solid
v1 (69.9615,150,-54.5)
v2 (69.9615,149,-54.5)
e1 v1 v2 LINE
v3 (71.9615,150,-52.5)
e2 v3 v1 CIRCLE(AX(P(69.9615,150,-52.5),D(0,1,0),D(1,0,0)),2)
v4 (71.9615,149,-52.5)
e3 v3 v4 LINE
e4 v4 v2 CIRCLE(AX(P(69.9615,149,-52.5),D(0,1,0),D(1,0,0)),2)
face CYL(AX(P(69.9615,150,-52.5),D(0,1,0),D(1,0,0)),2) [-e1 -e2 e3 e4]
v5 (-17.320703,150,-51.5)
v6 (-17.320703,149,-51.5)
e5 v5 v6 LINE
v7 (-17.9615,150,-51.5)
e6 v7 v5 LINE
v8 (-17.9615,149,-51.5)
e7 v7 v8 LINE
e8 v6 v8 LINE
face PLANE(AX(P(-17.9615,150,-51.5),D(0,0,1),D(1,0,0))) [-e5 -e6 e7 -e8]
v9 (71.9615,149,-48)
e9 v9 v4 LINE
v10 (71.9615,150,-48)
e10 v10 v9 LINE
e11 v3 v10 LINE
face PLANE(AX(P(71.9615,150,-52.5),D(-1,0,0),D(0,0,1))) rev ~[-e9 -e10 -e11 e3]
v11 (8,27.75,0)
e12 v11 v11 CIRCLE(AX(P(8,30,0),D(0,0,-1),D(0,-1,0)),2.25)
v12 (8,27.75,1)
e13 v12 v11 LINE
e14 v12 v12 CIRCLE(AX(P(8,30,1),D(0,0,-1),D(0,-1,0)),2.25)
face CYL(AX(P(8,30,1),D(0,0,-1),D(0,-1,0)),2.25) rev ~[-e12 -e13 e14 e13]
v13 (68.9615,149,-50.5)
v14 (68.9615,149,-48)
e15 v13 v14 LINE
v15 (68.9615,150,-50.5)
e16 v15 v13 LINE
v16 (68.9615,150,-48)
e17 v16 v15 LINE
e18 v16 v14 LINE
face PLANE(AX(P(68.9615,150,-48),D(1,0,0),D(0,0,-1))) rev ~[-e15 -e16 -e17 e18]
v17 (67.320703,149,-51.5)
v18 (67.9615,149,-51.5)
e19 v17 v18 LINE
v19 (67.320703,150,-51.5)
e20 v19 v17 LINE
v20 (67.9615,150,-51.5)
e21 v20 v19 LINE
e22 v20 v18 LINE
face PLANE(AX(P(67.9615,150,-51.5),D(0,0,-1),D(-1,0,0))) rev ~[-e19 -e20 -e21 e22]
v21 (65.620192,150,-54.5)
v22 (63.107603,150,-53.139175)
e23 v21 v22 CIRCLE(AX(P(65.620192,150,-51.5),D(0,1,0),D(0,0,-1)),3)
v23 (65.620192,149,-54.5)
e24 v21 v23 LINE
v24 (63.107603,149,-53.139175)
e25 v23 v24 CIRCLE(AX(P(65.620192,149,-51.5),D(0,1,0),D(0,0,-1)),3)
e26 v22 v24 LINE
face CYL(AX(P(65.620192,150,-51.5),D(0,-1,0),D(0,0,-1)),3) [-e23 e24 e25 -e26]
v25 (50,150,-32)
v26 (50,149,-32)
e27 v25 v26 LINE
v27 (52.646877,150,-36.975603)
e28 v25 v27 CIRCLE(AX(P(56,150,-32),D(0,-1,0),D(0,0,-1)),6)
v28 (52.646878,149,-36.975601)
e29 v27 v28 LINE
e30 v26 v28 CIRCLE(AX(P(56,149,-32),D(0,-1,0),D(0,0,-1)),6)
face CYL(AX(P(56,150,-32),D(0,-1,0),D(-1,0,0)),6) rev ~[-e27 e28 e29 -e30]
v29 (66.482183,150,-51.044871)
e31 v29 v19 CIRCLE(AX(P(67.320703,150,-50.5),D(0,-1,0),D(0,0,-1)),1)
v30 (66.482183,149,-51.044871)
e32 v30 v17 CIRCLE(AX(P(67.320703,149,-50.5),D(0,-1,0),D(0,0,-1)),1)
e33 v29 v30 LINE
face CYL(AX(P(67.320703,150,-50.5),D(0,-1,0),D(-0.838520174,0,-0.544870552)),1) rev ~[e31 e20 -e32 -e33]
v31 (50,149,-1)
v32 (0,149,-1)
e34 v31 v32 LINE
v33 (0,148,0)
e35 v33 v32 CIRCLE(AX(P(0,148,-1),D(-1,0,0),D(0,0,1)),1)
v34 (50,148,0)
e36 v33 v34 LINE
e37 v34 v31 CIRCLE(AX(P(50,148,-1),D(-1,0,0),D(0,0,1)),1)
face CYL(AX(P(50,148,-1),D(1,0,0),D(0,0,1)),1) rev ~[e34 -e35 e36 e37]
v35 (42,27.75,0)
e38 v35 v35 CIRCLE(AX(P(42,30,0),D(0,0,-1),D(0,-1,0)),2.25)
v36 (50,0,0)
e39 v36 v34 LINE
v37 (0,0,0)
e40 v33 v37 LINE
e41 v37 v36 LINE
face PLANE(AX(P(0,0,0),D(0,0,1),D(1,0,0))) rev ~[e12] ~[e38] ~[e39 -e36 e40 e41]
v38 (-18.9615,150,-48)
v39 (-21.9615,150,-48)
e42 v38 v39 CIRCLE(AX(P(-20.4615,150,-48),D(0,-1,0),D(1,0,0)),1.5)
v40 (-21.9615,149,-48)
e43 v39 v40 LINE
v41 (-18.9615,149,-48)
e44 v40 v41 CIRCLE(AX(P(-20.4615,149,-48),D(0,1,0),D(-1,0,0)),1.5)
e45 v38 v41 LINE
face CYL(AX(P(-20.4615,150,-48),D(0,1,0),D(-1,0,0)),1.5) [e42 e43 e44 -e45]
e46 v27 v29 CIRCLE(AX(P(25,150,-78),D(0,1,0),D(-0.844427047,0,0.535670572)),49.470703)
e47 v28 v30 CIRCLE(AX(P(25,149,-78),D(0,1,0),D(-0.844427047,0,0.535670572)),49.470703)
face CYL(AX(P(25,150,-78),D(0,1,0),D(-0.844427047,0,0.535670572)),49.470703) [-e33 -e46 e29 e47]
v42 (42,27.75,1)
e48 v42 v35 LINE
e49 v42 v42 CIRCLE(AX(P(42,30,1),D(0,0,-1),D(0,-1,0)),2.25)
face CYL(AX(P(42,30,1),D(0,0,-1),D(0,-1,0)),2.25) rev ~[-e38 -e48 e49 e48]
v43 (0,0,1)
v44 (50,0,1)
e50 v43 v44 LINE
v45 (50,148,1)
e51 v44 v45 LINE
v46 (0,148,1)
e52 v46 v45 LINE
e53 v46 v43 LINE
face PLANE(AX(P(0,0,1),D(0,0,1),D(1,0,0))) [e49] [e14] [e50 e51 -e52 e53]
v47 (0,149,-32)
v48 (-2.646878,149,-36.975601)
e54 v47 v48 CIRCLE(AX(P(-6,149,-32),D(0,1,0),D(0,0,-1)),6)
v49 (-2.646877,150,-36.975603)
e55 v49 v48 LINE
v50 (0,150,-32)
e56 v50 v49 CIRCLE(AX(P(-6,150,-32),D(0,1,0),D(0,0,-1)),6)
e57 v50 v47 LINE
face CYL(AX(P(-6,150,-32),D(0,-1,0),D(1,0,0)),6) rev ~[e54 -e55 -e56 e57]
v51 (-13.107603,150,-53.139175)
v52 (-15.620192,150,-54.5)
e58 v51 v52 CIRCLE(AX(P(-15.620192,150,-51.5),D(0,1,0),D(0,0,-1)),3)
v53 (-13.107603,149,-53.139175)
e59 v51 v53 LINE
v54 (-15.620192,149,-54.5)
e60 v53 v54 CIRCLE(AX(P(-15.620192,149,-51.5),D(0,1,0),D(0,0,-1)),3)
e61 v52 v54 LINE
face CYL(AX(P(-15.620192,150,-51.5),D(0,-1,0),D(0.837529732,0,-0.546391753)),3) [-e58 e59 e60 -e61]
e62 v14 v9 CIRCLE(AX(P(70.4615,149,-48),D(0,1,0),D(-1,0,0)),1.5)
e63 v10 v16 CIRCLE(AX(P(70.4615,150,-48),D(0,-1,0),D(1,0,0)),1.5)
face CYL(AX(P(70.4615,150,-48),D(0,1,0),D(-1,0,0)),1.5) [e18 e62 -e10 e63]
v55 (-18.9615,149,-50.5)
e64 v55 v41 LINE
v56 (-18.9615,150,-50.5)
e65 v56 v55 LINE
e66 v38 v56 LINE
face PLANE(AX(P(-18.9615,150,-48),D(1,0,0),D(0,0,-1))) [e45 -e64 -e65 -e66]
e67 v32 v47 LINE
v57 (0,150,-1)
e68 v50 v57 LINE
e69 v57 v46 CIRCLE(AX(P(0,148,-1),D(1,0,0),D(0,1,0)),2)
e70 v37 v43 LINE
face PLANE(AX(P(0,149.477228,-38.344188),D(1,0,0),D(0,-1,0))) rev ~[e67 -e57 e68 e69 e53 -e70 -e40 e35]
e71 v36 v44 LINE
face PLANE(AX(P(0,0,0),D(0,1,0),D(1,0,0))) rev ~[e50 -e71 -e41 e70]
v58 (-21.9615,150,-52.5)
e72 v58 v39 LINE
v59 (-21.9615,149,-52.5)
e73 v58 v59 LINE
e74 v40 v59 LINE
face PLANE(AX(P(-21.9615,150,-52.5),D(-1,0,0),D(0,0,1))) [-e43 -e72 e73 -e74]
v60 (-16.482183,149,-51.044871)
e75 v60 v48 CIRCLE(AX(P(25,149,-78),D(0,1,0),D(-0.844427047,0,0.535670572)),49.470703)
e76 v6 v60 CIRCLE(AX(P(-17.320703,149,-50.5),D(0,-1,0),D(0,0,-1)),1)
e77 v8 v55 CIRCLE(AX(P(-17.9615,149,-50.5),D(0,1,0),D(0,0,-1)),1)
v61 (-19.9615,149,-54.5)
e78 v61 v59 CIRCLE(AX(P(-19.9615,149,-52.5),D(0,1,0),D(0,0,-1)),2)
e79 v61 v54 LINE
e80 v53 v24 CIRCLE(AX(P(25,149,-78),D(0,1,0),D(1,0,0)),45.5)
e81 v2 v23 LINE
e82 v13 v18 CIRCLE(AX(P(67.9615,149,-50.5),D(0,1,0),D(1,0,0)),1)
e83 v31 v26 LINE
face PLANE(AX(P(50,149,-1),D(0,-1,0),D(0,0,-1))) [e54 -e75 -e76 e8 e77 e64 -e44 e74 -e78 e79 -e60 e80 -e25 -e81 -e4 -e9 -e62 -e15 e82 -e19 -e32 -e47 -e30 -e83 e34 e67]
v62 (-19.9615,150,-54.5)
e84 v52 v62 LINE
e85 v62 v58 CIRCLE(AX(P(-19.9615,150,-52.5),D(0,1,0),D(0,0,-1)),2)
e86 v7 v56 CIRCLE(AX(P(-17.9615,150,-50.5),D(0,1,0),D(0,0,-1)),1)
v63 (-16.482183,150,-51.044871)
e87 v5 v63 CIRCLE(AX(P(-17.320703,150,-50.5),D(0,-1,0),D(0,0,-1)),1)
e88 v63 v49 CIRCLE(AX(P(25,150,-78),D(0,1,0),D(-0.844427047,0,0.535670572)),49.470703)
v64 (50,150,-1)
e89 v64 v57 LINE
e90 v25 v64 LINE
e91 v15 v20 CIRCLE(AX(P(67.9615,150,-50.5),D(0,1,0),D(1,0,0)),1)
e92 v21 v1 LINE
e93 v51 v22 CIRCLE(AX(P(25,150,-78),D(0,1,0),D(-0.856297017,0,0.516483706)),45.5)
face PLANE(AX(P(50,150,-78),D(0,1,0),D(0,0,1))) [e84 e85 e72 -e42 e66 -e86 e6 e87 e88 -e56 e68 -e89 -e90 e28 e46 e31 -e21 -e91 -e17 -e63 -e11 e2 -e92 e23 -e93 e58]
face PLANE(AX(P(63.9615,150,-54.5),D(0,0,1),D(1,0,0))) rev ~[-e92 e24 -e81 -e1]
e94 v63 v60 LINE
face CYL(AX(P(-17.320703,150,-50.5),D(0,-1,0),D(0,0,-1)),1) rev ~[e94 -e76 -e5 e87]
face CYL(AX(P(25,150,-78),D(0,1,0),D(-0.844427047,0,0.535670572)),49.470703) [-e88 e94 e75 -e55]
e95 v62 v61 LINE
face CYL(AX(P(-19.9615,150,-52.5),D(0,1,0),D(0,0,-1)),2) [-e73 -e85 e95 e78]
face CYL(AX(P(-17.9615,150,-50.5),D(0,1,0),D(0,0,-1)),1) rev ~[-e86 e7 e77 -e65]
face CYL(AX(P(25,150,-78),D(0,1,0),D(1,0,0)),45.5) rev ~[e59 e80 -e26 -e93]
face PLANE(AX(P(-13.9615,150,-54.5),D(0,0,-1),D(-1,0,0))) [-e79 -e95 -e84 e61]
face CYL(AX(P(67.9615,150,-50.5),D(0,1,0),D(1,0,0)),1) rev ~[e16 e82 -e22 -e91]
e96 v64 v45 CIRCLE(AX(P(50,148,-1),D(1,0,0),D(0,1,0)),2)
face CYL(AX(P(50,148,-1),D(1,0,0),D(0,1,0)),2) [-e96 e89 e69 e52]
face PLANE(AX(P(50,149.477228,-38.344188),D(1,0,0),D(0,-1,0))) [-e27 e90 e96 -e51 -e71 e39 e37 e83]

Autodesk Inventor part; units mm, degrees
ref_plane "YZ Plane" through (0, 0, 0) normal (1, 0, 0) x (0, 1, 0)
ref_plane "XZ Plane" through (0, 0, 0) normal (0, 1, 0) x (-1, 0, 0)
ref_plane "XY Plane" through (0, 0, 0) normal (0, 0, 1) x (1, 0, 0)
sketch "Sketch1" plane through (0, 0, 0) normal (0, 0, 1) x (1, 0, 0)
  line L0 (0, 0) -> (50, 0)
  line L1 (50, 0) -> (50, 150)
  line L2 (50, 150) -> (0, 150)
  line L3 (0, 150) -> (0, 0)
  dimension "d0" = 50
  dimension "d1" = 150
extrude "Plate1" add sketch "Sketch1" along normal blind 1
sketch "Sketch2" plane through (50, 149, 1) normal (0, 1, 0) x (-1, 0, 0)
  line L0 (50, 0) -> (0, 0)
  line L1 (0, 0) -> (0, -79)
  line L2 (0, -79) -> (50, -79)
  line L3 (50, -79) -> (50, 0)
edge flange "Flange1" height 79 angle 90 thickness 1 bend radius 1 thickness toward (0, 1, 0) relief tear relief width 1 relief depth 0.5 edges at (25, 150, 0) wall of the first edge with corners at (0, 149, 1) (50, 149, 1) (50, 149, -78) (0, 149, -78)
bend "Bend1"
corner "Corner1"
sketch "Sketch4" plane through (0, 150, -78) normal (0, 1, 0) x (1, 0, 0)
  line L0 (0, 0) -> (50, 0)
  line L1 (0, 0) -> (-40, 0)
  line L2 (-40, 0) -> (-40, -40)
  line L3 (-40, -40) -> (0, -40)
  line L4 (0, -40) -> (0, 0)
  line L5 (50, -77) -> (50, 0)
  line L6 (50, 0) -> (90, 0)
  line L7 (90, 0) -> (90, -40)
  line L8 (90, -40) -> (50, -40)
  line L9 (50, -40) -> (50, 0)
  point P0 (0, -78)
  dimension "d14" = 40
  dimension "d15" = 40
  dimension "d16" = 40
  dimension "d17" = 40
sheet face with bend "Face2" sketch "Sketch4" thickness 1 toward (0, -1, 0) bend radius 1
bend "Bend2"
fillet "Corner Round7" radius 6 2 edges at (50, 149.5, -38) (0, 149.5, -38)
sketch "Sketch3" plane through (0, 150, -78) normal (0, 1, 0) x (1, 0, 0)
  line L0 (0, 0) -> (50, 0) projected
  circle A0 centre (25, 0) radius 45.5
  arc A1 (-16.7744, -26.5) -> (66.7744, -26.5) centre (25, 0) ccw
  arc A2 (0, -46) -> (-6, -40) centre (-6, -46) ccw projected
  circle A3 centre (-6, -46) radius 6
  arc A4 (56, -40) -> (50, -46) centre (56, -46) ccw projected
  circle A5 centre (56, -46) radius 6
  line L1 (-40, -40) -> (-6, -40) projected
  line L2 (-6, -40) -> (-40, -40)
  line L3 (-40, 0) -> (-40, -40) projected
  line L4 (-40, -40) -> (-40, 0)
  line L5 (-40, 0) -> (-20.5, 0)
  line L6 (90, 0) -> (-40, 0) projected
  line L7 (56, -40) -> (90, -40) projected
  line L8 (56, -40) -> (90, -40)
  line L9 (90, -40) -> (90, 0) projected
  line L10 (90, -40) -> (90, 0)
  line L11 (90, 0) -> (70.5, 0)
  line L12 (25, 0) -> (25, -45.5)
  line L13 (25, -45.5) -> (25, -23.5) construction
  line L14 (25, -23.5) -> (63.9615, -23.5) construction
  line L15 (63.9615, -23.5) -> (69.9615, -23.5)
  line L16 (63.9615, -23.5) -> (69.9615, -23.5) construction
  line L17 (71.9615, -25.5) -> (71.9615, -30)
  line L18 (70.4615, -31.5) -> (70.4615, -31.5)
  line L19 (25, -23.5) -> (-13.9615, -23.5) construction
  line L20 (-13.9615, -23.5) -> (-19.9615, -23.5)
  line L21 (-13.9615, -23.5) -> (-7.9615, -23.5) construction
  line L22 (-21.9615, -25.5) -> (-21.9615, -30)
  line L23 (-20.4615, -31.5) -> (-20.4615, -31.5)
  arc A6 (-16.7744, -26.5) -> (66.7744, -26.5) centre (25, 0) ccw
  line L24 (-18.9615, -30) -> (-18.9615, -27.5)
  line L25 (-17.9615, -26.5) -> (-16.7744, -26.5)
  line L26 (68.9615, -30) -> (68.9615, -27.5)
  line L27 (67.9615, -26.5) -> (66.7744, -26.5)
  arc A7 (-19.9615, -23.5) -> (-21.9615, -25.5) centre (-19.9615, -25.5) ccw
  arc A8 (-21.9615, -30) -> (-20.4615, -31.5) centre (-20.4615, -30) ccw
  arc A9 (-20.4615, -31.5) -> (-18.9615, -30) centre (-20.4615, -30) ccw
  arc A10 (-17.9615, -26.5) -> (-18.9615, -27.5) centre (-17.9615, -27.5) ccw
  arc A11 (71.9615, -25.5) -> (69.9615, -23.5) centre (69.9615, -25.5) ccw
  arc A12 (70.4615, -31.5) -> (71.9615, -30) centre (70.4615, -30) ccw
  arc A13 (68.9615, -30) -> (70.4615, -31.5) centre (70.4615, -30) ccw
  arc A14 (68.9615, -27.5) -> (67.9615, -26.5) centre (67.9615, -27.5) ccw
  point P0 (0, -78)
  point P1 (52.6469, -41.0244)
  point P2 (-2.6469, -41.0244)
  point P3 (71.9615, -23.5)
  point P4 (71.9615, -31.5)
  point P5 (68.9615, -31.5)
  point P6 (-21.9615, -23.5)
  point P7 (-21.9615, -31.5)
  point P8 (-18.9615, -31.5)
  point P9 (-18.9615, -26.5)
  point P10 (68.9615, -26.5)
  point P11 (-2.6469, -41.0244)
  point P12 (52.6469, -41.0244)
  point P13 (70.4615, -31.5)
  dimension "d13" = 91
  dimension "d84" = 22
  dimension "d85" = 8
  dimension "d86" = 0
  dimension "d87" = 8
  dimension "d88" = 3
  dimension "d89" = 8
  dimension "d90" = 180
  dimension "d91" = 8
  dimension "d92" = 90
  dimension "d93" = 3
  dimension "d95" = 5
  dimension "d96" = 5
  dimension "d97" = 2
  dimension "d98" = 1.5
  dimension "d99" = 1.5
  dimension "d100" = 1
  dimension "d101" = 2
  dimension "d102" = 1.5
  dimension "d103" = 1
extrude "Extrusion1" cut sketch "Sketch3" against normal through all contours L6 A0 L0 | L0 L12 A0 L6 | L0 L6 A0 L12 | A0 L20 A7 L22 A8 A9 L24 A10 L25 A1 A2 L1 L3 L5 | L6 L9 L7 A4 A1 L27 A14 L26 A13 A12 L17 A11 L15 A0
sketch "Sketch5" plane through (0, 150, -1) normal (0, 1, 0) x (1, 0, 0)
  arc A0 (-13.9615, 53.5) -> (63.9615, 53.5) centre (25, 77) ccw projected
  point P0 (0, -1)
  point P1 (70.5, 77)
  point P2 (-20.5, 77)
sketch "Sketch7" plane through (0, 0, 1) normal (0, 0, 1) x (1, 0, 0)
  line L0 (50, 0) -> (0, 0) projected
  line L1 (0, 0) -> (0, 148) projected
  line L2 (50, 148) -> (50, 0) projected
  point P0 (8, 30)
  point P1 (42, 30)
  dimension "d37" = 30
  dimension "d38" = 8
  dimension "d39" = 8
hole "Hole1" at (8, 30, 1) at (42, 30, 1) direction (0, 0, -1) diameter 4.5 end through all
fillet "Corner Round12" radius 1 1 edges at (-16.7744, 149.5, -51.5)
fillet "Corner Round13" radius 1 1 edges at (66.7744, 149.5, -51.5)
fillet "Corner Round14" radius 3 1 edges at (63.9615, 149.5, -54.5)
fillet "Corner Round15" radius 3 1 edges at (-13.9615, 149.5, -54.5)
sketch "Sketch10" plane through (0, 150, -1) normal (0, 1, 0) x (1, 0, 0)
  arc A0 (70.7921, 70.1608) -> (-20.7921, 70.1608) centre (25, 77) ccw
  line L0 (25, 77) -> (25, 30.7) construction
  line L1 (-17.3207, 50.5) -> (-17.9615, 50.5) projected
  line L2 (-18.9615, 47) -> (-18.9615, 49.5) projected
  line L3 (-17.6615, 49.2) -> (-20.7921, 70.1608)
  line L4 (-20.7921, 70.1608) -> (25, 70.1608) construction
  line L5 (68.9615, 49.5) -> (68.9615, 47) projected
  line L6 (67.3207, 50.5) -> (67.9615, 50.5) projected
  line L7 (67.6615, 49.2) -> (70.7921, 70.1608)
  line L8 (70.7921, 70.1608) -> (25, 70.1608) construction
  point P0 (0, -1)
  dimension "d109" = 92.6
  dimension "d115" = 1.3
  dimension "d116" = 1.3
  dimension "d117" = 45.7921
  dimension "d118" = 6.8392
  dimension "d119" = 1.3
  dimension "d120" = 1.3
  dimension "d121" = 45.7921
equation "\"d39\" = d38"
equation "\"d16\" = d14"
equation "\"d17\" = d15"
equation "\"d45\" = Thickness"
equation "\"d2\" = Thickness"
equation "\"d3\" = BendReliefWidth"
equation "\"d4\" = BendReliefDepth"
equation "\"d5\" = MinimumRemnant"
equation "\"d6\" = TransitionRadius"
equation "\"d9\" = BendRadius"
equation "\"d10\" = CornerReliefSize"
equation "\"d11\" = GapSize"
equation "\"d12\" = JacobiRadiusSize"
equation "\"d18\" = BendRadius"
equation "\"d19\" = BendReliefWidth"
equation "\"d21\" = MinimumRemnant"
equation "\"d20\" = BendReliefDepth"
equation "\"d22\" = TransitionRadius"
equation "\"BendRadius\" = Thickness"
equation "\"BendReliefWidth\" = Thickness"
equation "\"BendReliefDepth\" = 0.5 * Thickness"
equation "\"CornerReliefSize\" = 4 * Thickness"
equation "\"MinimumRemnant\" = 2 * Thickness"
equation "\"TransitionRadius\" = BendRadius"
equation "\"JacobiRadiusSize\" = BendRadius"
equation "\"GapSize\" = Thickness"
equation "\"Thickness\" = 1"
properties part number "Glass fixer plate" material "Steel, Carbon"
